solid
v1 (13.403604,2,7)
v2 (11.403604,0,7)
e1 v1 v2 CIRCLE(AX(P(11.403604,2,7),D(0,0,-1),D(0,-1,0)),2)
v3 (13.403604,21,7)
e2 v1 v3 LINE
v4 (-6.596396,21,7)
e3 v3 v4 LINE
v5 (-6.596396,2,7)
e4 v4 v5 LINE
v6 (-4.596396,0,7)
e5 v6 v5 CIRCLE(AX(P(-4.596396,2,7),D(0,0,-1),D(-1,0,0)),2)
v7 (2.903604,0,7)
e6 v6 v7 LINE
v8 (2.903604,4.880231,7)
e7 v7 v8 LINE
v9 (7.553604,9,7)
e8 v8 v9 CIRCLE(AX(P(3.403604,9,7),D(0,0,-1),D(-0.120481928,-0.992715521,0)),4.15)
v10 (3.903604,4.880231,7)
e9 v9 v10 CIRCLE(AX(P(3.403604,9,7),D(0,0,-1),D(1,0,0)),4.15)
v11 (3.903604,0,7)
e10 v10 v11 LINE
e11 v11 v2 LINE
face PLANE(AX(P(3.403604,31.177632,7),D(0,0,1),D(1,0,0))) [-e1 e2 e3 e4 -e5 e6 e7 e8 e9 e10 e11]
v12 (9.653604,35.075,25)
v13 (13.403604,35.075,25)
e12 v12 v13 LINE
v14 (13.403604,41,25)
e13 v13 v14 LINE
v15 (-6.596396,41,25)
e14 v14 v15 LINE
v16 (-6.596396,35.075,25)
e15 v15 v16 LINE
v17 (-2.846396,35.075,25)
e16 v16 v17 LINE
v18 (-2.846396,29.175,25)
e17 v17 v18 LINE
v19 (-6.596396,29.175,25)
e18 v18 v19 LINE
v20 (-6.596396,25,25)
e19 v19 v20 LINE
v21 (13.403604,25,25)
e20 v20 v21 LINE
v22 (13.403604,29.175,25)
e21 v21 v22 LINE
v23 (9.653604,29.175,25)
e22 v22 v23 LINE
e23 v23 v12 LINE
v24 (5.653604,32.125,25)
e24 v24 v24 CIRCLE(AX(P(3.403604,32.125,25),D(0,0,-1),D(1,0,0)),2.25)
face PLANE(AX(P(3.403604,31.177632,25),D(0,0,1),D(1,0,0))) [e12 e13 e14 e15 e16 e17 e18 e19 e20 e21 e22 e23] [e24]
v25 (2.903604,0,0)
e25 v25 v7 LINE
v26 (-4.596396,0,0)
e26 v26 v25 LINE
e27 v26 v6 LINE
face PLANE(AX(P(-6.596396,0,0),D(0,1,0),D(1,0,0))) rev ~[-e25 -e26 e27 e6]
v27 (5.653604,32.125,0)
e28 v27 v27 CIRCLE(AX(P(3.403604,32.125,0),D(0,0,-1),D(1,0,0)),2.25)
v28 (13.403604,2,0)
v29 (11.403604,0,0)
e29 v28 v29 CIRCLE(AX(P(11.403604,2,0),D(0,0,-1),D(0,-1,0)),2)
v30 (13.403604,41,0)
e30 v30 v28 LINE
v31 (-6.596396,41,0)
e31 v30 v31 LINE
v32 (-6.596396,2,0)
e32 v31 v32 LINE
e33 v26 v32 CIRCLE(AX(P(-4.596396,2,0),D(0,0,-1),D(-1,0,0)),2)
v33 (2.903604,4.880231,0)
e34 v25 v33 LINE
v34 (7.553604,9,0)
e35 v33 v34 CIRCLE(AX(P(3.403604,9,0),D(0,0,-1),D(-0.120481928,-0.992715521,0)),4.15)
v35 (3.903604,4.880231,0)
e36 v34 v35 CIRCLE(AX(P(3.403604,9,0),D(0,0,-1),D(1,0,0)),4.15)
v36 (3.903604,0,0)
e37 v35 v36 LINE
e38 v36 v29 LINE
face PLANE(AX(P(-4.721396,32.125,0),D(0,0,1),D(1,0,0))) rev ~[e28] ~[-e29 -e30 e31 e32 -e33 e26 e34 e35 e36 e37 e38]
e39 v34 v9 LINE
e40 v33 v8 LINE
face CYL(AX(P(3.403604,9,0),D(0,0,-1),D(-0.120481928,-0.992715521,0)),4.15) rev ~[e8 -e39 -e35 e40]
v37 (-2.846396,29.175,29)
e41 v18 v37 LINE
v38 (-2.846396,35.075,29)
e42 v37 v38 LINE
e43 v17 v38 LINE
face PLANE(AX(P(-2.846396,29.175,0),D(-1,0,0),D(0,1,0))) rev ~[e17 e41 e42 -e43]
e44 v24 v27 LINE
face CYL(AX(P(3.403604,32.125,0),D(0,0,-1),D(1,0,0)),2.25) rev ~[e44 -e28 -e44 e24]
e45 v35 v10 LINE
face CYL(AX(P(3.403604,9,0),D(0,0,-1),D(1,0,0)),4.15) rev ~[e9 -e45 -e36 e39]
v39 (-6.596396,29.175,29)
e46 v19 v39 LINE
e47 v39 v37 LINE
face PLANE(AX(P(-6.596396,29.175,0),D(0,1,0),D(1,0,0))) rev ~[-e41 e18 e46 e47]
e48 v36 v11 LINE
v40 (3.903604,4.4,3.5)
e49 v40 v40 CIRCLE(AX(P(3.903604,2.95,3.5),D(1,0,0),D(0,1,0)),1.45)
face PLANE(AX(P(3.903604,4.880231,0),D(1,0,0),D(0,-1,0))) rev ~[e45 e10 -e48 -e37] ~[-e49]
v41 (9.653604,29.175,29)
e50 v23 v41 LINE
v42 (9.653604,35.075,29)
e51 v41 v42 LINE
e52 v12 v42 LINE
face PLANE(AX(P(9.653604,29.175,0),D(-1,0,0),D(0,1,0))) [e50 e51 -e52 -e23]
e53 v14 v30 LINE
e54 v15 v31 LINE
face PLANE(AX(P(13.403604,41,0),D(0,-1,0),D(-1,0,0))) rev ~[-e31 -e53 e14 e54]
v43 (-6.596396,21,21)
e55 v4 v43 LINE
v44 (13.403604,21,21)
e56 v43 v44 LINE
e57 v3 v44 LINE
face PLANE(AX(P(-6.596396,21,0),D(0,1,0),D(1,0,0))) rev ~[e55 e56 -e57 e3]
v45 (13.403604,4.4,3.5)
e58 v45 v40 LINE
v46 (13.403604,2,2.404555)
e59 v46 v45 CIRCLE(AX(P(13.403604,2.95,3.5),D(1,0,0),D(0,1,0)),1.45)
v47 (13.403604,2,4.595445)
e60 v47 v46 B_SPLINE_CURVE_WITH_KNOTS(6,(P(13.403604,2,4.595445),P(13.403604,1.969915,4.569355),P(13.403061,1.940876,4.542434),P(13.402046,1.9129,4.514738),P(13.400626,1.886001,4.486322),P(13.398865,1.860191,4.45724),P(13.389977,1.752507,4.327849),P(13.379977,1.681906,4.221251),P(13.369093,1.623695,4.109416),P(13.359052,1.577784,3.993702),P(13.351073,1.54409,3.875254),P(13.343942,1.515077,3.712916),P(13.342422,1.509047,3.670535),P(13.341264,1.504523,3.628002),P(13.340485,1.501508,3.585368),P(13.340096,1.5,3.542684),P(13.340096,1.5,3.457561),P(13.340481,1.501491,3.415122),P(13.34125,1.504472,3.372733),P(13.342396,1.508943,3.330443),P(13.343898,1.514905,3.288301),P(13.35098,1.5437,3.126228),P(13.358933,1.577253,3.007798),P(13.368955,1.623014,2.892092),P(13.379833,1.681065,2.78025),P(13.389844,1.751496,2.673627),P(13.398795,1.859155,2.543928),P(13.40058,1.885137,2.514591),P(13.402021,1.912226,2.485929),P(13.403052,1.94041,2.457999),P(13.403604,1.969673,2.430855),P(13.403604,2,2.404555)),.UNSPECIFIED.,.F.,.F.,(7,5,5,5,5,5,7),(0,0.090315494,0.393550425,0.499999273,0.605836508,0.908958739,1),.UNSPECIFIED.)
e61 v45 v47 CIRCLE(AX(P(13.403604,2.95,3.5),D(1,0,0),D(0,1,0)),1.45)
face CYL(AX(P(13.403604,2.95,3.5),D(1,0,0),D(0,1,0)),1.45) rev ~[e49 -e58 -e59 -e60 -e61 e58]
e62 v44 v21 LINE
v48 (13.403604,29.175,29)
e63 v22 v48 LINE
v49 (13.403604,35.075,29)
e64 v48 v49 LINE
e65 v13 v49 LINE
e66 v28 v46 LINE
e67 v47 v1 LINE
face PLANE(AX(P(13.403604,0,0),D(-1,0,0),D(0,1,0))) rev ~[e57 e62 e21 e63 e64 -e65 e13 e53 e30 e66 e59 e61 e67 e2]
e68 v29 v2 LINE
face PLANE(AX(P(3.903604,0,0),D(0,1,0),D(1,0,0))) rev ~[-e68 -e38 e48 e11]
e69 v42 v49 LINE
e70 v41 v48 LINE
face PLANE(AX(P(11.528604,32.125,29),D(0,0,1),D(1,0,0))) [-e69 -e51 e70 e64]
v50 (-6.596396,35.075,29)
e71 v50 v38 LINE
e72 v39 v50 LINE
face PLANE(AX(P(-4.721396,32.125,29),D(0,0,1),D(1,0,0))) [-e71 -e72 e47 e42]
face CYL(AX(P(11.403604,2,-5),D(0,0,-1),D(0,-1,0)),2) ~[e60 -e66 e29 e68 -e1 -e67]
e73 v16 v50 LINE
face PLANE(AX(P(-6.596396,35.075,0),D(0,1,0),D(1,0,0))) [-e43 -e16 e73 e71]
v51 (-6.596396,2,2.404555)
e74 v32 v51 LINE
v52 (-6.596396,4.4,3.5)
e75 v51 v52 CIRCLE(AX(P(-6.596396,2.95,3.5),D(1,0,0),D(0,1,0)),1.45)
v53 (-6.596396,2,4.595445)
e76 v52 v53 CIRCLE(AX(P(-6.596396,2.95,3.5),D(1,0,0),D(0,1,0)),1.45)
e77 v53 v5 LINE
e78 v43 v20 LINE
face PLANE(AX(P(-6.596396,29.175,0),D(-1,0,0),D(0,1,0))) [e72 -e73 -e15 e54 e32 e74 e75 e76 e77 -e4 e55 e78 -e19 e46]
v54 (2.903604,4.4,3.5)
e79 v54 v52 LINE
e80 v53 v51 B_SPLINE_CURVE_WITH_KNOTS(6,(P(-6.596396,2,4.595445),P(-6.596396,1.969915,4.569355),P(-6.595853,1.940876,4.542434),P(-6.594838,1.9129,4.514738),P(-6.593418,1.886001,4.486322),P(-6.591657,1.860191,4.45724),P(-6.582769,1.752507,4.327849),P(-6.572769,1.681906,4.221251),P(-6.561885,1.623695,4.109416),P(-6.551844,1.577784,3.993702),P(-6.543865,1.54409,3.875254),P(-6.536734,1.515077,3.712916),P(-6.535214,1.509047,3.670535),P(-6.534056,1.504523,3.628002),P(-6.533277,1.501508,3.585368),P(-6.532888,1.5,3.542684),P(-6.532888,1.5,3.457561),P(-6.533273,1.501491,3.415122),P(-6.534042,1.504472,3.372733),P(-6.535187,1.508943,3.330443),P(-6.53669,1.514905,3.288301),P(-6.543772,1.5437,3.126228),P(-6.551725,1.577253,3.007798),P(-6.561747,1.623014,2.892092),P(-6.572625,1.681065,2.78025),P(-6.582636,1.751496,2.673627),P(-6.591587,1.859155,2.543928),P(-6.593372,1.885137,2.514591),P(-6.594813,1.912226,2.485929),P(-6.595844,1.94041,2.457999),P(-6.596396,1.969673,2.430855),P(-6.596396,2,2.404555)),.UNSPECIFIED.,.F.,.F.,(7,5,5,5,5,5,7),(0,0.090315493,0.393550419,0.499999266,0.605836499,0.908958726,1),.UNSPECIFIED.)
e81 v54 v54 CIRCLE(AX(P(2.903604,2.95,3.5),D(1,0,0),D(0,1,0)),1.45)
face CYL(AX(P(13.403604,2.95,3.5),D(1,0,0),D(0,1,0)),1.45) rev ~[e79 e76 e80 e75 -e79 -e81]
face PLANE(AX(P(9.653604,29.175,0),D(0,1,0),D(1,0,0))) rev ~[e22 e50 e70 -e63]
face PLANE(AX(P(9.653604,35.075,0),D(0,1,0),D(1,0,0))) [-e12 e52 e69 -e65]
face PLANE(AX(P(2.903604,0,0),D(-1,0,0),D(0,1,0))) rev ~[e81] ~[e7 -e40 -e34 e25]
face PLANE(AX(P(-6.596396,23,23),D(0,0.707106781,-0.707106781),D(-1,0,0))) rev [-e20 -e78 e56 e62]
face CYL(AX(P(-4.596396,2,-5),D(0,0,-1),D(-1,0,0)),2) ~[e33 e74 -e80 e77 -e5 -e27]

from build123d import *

# Parameters (mm, degrees)
F1_DEPTH    = 7
F2_R        = 1.45
F3_DEPTH    = 25
F4_T1_DEPTH = 17
F5_DEPTH    = 25
F0_W        = 3.75
F0_H        = 5.9
F6_DEPTH    = 29
F7_SIZE     = 4


# Not quite as in the source:
# - a fillet or chamfer that OpenCascade refuses, or shapes differently, is made with other operations: its cross-section is extruded or revolved along the edge and cut away or added
# - a feature names something its author has since deleted; it is built from what else it names


with BuildPart() as f1:
    # F0 (on Top) → F1 (new body)
    with BuildSketch(Plane.XY):
        Polygon((-6.5963959517, 29.175), (-6.5963959517, 21), (13.4036040483, 21), (13.4036040483, 29.175), (9.6536040483, 29.175), (9.6536040483, 35.075), (13.4036040483, 35.075), (13.4036040483, 41), (-6.5963959517, 41), (-6.5963959517, 35.075), (-2.8463959517, 35.075), (-2.8463959517, 29.175), align=None)
        with BuildLine():
            ThreePointArc((1.1536040483, 32.125), (3.4036040483, 34.375), (5.6536040483, 32.125))
            ThreePointArc((5.6536040483, 32.125), (3.4036040483, 29.875), (1.1536040483, 32.125))
        make_face(mode=Mode.SUBTRACT)
        with BuildLine():
            Line((-6.5963959517, 21), (-6.5963959517, 0))
            Line((-6.5963959517, 0), (2.9036040483, 0))
            Line((2.9036040483, 0), (2.9036040483, 4.880230589))
            ThreePointArc((2.9036040483, 4.880230589), (0.6515593539, 12.1062437123), (7.5536040483, 9))
            ThreePointArc((7.5536040483, 9), (6.5098477606, 6.2479553056), (3.9036040483, 4.880230589))
            Line((3.9036040483, 4.880230589), (3.9036040483, 0))
            Line((3.9036040483, 0), (13.4036040483, 0))
            Line((13.4036040483, 0), (13.4036040483, 21))
            Line((13.4036040483, 21), (-6.5963959517, 21))
        make_face()
    extrude(amount=F1_DEPTH)

    # F2 (on face) → F3 (cut)
    with BuildSketch(Plane.YZ.offset(13.4036040483)):
        with Locations((2.95, 3.5)):
            Circle(F2_R)
    extrude(amount=-F3_DEPTH, mode=Mode.SUBTRACT)

    # F4: fillet of radius 2 on 2 edges, made by hand

    # F4_s2 → F4_t1 (cut)
    with BuildSketch(Plane.XY.offset(-5)):
        with BuildLine():
            ThreePointArc((11.4036040483, 0), (12.8178176107, 0.5857864376), (13.4036040483, 2))
            Line((13.4036040483, 2), (13.4036040483, 0))
            Line((13.4036040483, 0), (11.4036040483, 0))
        make_face()
        with BuildLine():
            ThreePointArc((-6.5963959517, 2), (-6.010609514, 0.5857864376), (-4.5963959517, 0))
            Line((-4.5963959517, 0), (-6.5963959517, 0))
            Line((-6.5963959517, 0), (-6.5963959517, 2))
        make_face()
    extrude(amount=F4_T1_DEPTH, mode=Mode.SUBTRACT)

    # F0 (on Top) → F5 (join)
    with BuildSketch(Plane.XY):
        Polygon((-6.5963959517, 29.175), (-6.5963959517, 21), (13.4036040483, 21), (13.4036040483, 29.175), (9.6536040483, 29.175), (9.6536040483, 35.075), (13.4036040483, 35.075), (13.4036040483, 41), (-6.5963959517, 41), (-6.5963959517, 35.075), (-2.8463959517, 35.075), (-2.8463959517, 29.175), align=None)
        with BuildLine():
            ThreePointArc((1.1536040483, 32.125), (3.4036040483, 34.375), (5.6536040483, 32.125))
            ThreePointArc((5.6536040483, 32.125), (3.4036040483, 29.875), (1.1536040483, 32.125))
        make_face(mode=Mode.SUBTRACT)
    extrude(amount=F5_DEPTH)

    # F0 (on Top) → F6 (join)
    with BuildSketch(Plane.XY):
        with Locations((-4.7213959517, 32.125)):
            Rectangle(F0_W, F0_H)
        with Locations((11.5286040483, 32.125)):
            Rectangle(F0_W, F0_H)
    extrude(amount=F6_DEPTH)

    # F7
    f7_edges = [f1.edges().sort_by_distance(p)[0] for p in [
        (3.403604, 21, 25),
    ]]
    chamfer(f7_edges, length=F7_SIZE)


solid = f1.part
